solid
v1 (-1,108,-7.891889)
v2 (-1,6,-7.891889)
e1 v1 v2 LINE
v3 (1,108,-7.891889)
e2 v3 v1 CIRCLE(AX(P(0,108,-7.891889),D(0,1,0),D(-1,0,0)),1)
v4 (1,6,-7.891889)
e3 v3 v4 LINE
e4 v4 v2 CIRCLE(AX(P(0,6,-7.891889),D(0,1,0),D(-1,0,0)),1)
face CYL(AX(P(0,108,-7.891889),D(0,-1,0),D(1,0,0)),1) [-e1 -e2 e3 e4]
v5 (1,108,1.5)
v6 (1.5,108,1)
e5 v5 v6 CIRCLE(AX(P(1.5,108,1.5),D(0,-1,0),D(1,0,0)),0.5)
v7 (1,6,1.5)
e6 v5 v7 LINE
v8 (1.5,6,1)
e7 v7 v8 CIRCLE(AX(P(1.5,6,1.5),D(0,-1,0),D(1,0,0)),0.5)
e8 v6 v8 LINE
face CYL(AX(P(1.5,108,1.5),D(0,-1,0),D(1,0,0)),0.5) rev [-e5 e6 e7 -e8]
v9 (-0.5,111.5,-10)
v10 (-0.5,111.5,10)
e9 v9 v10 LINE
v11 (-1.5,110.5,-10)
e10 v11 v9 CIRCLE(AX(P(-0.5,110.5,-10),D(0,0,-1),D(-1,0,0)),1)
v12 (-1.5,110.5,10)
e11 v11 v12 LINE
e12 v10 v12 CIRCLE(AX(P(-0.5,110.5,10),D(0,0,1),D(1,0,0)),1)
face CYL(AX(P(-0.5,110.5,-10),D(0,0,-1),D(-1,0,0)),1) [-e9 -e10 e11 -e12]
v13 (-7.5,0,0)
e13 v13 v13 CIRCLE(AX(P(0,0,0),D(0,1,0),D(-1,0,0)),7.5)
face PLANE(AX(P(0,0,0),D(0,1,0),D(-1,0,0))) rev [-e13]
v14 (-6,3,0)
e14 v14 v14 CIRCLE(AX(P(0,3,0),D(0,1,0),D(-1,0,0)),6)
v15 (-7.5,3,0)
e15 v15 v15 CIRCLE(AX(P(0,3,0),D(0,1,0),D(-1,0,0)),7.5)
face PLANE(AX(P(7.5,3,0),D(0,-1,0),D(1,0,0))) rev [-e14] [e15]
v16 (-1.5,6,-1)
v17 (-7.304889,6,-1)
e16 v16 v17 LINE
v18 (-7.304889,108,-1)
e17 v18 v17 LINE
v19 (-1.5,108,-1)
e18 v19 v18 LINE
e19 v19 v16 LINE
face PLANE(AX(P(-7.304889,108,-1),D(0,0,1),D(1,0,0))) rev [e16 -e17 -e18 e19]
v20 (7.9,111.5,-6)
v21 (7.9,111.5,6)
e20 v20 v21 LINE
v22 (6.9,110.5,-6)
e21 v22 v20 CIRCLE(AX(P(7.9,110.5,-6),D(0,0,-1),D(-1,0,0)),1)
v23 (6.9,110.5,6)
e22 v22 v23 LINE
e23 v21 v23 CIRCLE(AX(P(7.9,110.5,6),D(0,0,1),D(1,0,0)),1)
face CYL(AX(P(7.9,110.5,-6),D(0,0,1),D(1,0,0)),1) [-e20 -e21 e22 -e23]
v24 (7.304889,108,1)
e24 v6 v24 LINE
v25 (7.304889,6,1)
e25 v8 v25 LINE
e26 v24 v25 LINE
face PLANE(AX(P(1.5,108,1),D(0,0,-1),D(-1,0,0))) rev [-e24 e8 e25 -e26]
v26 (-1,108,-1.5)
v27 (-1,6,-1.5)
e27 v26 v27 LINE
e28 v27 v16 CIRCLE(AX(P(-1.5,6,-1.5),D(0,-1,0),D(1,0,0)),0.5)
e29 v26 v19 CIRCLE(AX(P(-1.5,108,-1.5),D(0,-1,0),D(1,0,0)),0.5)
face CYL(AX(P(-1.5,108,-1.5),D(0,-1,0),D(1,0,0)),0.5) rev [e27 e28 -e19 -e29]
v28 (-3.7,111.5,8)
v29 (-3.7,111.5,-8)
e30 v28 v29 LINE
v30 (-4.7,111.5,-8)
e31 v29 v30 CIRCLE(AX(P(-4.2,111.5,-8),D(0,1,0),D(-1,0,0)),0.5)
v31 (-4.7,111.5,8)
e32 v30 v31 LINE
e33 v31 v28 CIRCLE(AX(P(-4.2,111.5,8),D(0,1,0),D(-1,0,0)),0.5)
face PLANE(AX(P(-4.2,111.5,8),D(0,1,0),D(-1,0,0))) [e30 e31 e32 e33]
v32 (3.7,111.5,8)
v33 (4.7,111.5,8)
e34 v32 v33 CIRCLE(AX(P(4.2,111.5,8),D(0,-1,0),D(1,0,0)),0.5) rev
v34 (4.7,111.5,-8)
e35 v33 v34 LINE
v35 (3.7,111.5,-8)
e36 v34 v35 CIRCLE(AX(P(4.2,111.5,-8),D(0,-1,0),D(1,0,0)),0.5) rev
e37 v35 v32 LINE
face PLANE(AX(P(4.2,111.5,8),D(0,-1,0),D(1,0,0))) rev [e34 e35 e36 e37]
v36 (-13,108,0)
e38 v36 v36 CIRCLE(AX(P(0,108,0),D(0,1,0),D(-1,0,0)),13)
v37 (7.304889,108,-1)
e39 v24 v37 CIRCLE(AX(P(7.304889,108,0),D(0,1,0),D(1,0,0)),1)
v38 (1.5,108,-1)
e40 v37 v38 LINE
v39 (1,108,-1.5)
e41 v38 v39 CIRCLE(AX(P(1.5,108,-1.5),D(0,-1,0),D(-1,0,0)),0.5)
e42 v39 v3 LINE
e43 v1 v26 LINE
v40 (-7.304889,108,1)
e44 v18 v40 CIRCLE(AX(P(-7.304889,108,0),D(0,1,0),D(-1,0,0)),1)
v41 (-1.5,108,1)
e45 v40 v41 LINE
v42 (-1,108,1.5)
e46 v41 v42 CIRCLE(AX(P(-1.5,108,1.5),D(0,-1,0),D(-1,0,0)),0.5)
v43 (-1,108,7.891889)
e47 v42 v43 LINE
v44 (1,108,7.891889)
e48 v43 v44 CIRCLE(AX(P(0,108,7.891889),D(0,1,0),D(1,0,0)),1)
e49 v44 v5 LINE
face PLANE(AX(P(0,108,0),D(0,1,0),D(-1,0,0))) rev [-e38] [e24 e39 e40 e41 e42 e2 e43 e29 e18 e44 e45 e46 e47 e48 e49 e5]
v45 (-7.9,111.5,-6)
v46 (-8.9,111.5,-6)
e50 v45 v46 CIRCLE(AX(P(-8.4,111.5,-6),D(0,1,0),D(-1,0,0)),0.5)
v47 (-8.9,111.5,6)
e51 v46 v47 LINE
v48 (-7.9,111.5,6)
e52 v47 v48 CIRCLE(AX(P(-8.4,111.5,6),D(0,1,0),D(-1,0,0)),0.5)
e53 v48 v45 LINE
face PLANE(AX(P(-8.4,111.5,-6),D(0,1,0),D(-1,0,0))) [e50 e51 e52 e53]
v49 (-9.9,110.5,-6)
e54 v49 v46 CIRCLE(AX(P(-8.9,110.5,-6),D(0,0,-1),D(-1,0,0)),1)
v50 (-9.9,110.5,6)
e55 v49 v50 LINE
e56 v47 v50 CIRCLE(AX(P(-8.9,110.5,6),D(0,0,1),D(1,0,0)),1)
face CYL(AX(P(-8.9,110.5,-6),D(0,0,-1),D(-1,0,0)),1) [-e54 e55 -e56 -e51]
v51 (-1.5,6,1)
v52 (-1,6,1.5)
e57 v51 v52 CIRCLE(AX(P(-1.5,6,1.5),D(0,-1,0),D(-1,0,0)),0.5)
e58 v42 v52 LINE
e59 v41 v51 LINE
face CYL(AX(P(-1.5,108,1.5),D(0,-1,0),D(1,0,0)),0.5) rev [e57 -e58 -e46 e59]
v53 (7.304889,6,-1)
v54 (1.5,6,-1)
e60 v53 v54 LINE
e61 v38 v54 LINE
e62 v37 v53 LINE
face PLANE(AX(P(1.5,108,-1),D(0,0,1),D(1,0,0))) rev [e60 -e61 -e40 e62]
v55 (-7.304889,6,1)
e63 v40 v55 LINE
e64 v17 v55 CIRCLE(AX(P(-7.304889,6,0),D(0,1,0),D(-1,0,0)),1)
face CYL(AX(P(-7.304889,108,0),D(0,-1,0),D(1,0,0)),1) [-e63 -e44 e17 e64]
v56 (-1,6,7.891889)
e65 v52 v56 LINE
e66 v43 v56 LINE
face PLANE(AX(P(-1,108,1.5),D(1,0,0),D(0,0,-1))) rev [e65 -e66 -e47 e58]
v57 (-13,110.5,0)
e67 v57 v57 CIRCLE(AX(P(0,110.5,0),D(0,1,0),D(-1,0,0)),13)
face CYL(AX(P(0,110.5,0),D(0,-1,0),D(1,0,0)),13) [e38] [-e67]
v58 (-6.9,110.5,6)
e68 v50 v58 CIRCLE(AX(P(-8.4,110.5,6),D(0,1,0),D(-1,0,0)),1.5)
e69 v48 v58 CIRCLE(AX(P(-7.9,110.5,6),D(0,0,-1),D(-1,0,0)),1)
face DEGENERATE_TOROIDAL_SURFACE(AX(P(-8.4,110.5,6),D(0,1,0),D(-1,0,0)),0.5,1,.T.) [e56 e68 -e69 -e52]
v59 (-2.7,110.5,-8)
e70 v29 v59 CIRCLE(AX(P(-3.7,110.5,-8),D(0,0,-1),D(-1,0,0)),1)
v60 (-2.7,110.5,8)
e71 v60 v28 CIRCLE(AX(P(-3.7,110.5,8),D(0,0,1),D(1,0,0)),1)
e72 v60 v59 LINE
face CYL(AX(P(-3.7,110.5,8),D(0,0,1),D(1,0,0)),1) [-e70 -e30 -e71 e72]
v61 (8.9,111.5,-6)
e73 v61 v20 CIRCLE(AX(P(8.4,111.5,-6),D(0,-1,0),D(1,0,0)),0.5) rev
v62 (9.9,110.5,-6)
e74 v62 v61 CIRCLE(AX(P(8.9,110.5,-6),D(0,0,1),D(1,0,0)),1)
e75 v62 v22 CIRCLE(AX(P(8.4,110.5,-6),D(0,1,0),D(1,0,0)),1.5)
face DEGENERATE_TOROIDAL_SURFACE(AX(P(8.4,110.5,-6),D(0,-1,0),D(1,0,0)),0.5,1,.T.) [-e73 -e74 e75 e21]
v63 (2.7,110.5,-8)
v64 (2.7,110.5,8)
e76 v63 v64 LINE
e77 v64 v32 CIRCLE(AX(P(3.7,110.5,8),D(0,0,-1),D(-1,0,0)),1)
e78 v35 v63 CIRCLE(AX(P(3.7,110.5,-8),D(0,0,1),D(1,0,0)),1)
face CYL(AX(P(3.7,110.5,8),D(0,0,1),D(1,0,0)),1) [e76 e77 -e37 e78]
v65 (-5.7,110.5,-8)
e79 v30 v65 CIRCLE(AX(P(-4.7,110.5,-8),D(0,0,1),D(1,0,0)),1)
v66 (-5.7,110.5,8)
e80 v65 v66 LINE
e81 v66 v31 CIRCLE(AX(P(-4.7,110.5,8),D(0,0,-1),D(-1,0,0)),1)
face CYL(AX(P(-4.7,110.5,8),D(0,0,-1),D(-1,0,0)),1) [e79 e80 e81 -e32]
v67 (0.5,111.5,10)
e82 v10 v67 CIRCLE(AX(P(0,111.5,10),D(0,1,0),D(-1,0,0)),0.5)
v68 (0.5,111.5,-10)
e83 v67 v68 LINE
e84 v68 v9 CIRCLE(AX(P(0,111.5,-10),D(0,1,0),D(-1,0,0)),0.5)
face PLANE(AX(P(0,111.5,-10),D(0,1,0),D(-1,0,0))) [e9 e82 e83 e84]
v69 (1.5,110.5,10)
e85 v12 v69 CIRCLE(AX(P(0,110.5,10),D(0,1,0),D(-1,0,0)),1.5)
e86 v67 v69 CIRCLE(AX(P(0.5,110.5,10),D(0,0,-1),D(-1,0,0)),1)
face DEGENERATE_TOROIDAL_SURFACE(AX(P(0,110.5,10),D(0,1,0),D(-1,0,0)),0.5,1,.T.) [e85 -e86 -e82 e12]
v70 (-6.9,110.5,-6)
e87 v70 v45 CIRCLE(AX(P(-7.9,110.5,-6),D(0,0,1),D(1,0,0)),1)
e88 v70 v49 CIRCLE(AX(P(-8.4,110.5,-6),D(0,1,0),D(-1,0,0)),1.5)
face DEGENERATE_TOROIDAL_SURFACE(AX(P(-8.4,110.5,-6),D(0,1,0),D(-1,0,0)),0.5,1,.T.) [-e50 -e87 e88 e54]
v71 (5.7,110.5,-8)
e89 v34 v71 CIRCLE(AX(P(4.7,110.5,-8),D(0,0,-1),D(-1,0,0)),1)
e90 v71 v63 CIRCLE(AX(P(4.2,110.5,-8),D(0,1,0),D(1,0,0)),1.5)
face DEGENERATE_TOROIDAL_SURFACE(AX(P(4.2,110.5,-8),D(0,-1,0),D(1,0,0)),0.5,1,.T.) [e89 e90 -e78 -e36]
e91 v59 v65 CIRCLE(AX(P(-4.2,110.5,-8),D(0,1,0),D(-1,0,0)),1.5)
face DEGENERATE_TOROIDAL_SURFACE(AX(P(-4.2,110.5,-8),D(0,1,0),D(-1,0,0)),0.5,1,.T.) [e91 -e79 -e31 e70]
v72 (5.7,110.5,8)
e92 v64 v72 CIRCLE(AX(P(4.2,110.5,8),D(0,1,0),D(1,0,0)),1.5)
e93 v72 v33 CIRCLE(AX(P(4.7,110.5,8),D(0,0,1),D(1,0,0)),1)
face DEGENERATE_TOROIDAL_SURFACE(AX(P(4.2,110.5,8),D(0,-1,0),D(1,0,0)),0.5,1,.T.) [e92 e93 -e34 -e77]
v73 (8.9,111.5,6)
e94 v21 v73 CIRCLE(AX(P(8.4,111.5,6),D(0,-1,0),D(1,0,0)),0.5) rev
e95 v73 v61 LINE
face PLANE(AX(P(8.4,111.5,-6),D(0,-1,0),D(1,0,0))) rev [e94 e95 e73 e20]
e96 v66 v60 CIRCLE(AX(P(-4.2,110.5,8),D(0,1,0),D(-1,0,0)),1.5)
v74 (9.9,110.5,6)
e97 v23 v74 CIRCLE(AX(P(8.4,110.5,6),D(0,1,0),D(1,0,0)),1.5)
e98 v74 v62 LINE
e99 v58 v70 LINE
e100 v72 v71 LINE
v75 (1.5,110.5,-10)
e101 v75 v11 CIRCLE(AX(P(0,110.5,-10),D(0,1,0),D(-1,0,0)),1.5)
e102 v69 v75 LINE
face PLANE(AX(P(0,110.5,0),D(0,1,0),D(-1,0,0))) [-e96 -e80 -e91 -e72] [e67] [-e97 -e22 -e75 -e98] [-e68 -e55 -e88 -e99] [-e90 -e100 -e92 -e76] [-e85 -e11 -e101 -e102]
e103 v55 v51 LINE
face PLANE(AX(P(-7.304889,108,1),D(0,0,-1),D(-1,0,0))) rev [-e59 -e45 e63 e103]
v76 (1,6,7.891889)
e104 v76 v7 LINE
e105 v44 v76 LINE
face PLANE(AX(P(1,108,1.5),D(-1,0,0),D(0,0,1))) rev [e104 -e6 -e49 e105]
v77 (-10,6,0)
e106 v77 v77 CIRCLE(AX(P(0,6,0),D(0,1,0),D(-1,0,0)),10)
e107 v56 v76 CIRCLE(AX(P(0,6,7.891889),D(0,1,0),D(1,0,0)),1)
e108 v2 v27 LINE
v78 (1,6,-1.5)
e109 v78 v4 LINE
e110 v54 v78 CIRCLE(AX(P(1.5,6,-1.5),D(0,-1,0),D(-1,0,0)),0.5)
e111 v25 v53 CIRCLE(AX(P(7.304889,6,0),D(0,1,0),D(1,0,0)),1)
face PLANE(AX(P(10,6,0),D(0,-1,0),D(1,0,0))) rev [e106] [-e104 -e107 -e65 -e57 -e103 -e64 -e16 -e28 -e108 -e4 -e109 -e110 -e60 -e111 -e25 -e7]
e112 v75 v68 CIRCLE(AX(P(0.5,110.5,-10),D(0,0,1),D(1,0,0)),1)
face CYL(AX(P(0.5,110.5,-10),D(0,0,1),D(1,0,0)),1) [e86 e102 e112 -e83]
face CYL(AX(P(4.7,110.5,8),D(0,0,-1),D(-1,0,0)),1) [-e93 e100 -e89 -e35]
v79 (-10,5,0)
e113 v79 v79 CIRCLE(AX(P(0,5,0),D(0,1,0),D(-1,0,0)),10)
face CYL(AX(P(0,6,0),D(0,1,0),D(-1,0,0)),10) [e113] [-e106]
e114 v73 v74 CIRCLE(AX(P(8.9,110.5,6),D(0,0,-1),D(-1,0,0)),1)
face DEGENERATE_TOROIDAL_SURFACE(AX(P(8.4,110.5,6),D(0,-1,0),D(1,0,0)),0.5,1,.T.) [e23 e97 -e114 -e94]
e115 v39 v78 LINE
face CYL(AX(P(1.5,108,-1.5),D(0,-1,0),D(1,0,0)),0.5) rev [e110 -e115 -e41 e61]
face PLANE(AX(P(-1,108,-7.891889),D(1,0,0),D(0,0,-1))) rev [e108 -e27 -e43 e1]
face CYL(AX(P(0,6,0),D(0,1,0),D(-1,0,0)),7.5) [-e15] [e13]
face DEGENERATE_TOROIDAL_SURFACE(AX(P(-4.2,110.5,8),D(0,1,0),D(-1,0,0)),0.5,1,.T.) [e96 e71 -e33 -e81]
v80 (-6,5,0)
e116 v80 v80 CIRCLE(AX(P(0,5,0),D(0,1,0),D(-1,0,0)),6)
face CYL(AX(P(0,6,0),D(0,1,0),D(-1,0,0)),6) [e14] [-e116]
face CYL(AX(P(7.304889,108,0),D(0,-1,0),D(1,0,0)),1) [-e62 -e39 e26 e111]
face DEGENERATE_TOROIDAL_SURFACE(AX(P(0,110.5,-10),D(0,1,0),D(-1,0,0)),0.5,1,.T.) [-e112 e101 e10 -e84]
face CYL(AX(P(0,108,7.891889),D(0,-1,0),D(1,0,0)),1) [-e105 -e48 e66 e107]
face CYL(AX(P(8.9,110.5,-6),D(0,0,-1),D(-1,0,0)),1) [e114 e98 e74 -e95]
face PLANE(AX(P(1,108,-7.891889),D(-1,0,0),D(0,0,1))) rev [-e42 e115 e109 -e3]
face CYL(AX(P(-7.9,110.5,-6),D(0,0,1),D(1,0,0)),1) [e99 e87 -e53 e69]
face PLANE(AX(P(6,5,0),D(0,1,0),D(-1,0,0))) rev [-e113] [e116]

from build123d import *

# Parameters (mm, degrees)
BOSS_EXTRUDE1_DEPTH = 102
SKETCH3_R           = 13
BOSS_EXTRUDE3_DEPTH = 2.5
BOSS_EXTRUDE4_DEPTH = 1
FILLET1_R           = 1


with BuildPart() as part:
    # Sketch1 → Revolve1 (revolve)
    with BuildSketch(Plane.XY, mode=Mode.PRIVATE) as revolve1_sk:
        Polygon((0, 0), (7.5, 0), (7.5, 3), (6, 3), (6, 5), (10, 5), (10, 6), (0, 6), align=None)
    revolve(revolve1_sk.sketch.rotate(Axis((0, 6, 0), (0, -1, 0)), 180), axis=Axis((0, 6, 0), (0, -1, 0)))

    # Sketch2 → Boss-Extrude1 (add)
    with BuildSketch(Plane(origin=(0, 6, 0), x_dir=(1, 0, 0), z_dir=(0, 1, 0))):
        with BuildLine():
            Line((-1, 7.891889069), (-1, 1.5))
            ThreePointArc((-1, 1.5), (-1.146446609, 1.146446609), (-1.5, 1))
            Line((-1.5, 1), (-7.304889055, 1))
            ThreePointArc((-7.304889055, 1), (-8.304889055, 0), (-7.304889055, -1))
            Line((-7.304889055, -1), (-1.5, -1))
            ThreePointArc((-1.5, -1), (-1.146446609, -1.146446609), (-1, -1.5))
            Line((-1, -1.5), (-1, -7.891889069))
            ThreePointArc((-1, -7.891889069), (0, -8.891889069), (1, -7.891889069))
            Line((1, -7.891889069), (1, -1.5))
            ThreePointArc((1, -1.5), (1.146446609, -1.146446609), (1.5, -1))
            Line((1.5, -1), (7.304889055, -1))
            ThreePointArc((7.304889055, -1), (8.304889055, 0), (7.304889055, 1))
            Line((7.304889055, 1), (1.5, 1))
            ThreePointArc((1.5, 1), (1.146446609, 1.146446609), (1, 1.5))
            Line((1, 1.5), (1, 7.891889069))
            ThreePointArc((1, 7.891889069), (0, 8.891889069), (-1, 7.891889069))
        make_face()
    extrude(amount=BOSS_EXTRUDE1_DEPTH)

    # Sketch3 → Boss-Extrude3 (add)
    with BuildSketch(Plane(origin=(0, 108, 0), x_dir=(1, 0, 0), z_dir=(0, 1, 0))):
        with Locations(Location((0, 0, 0), (0, 0, 180))):
            Circle(SKETCH3_R)
    extrude(amount=BOSS_EXTRUDE3_DEPTH)

    # Sketch4 → Boss-Extrude4 (add)
    with BuildSketch(Plane(origin=(0, 110.5, 0), x_dir=(1, 0, 0), z_dir=(0, 1, 0))):
        with BuildLine():
            Line((-1.5, 10), (-1.5, -10))
            ThreePointArc((-1.5, -10), (0, -11.5), (1.5, -10))
            Line((1.5, -10), (1.5, 10))
            ThreePointArc((1.5, 10), (0, 11.5), (-1.5, 10))
        make_face()
        with BuildLine():
            Line((-5.7, 8), (-5.7, -8))
            ThreePointArc((-5.7, -8), (-4.2, -9.5), (-2.7, -8))
            Line((-2.7, -8), (-2.7, 8))
            ThreePointArc((-2.7, 8), (-4.2, 9.5), (-5.7, 8))
        make_face()
        with BuildLine():
            Line((-9.9, 6), (-9.9, -6))
            ThreePointArc((-9.9, -6), (-8.4, -7.5), (-6.9, -6))
            Line((-6.9, -6), (-6.9, 6))
            ThreePointArc((-6.9, 6), (-8.4, 7.5), (-9.9, 6))
        make_face()
        with BuildLine():
            Line((6.9, 6), (6.9, -6))
            ThreePointArc((6.9, -6), (8.4, -7.5), (9.9, -6))
            Line((9.9, -6), (9.9, 6))
            ThreePointArc((9.9, 6), (8.4, 7.5), (6.9, 6))
        make_face()
        with BuildLine():
            Line((2.7, 8), (2.7, -8))
            ThreePointArc((2.7, -8), (4.2, -9.5), (5.7, -8))
            Line((5.7, -8), (5.7, 8))
            ThreePointArc((5.7, 8), (4.2, 9.5), (2.7, 8))
        make_face()
    extrude(amount=BOSS_EXTRUDE4_DEPTH)

    # Fillet1
    fillet1_edges = [part.edges().sort_by_distance(p)[0] for p in [
        (9.9, 111.5, 0),
        (8.4, 111.5, 7.5),
        (6.9, 111.5, 0),
        (8.4, 111.5, -7.5),
        (2.7, 111.5, 0),
        (4.2, 111.5, -9.5),
        (5.7, 111.5, 0),
        (4.2, 111.5, 9.5),
        (1.5, 111.5, 0),
        (0, 111.5, 11.5),
        (-1.5, 111.5, 0),
        (0, 111.5, -11.5),
        (-5.7, 111.5, 0),
        (-4.2, 111.5, -9.5),
        (-2.7, 111.5, 0),
        (-4.2, 111.5, 9.5),
        (-6.9, 111.5, 0),
        (-8.4, 111.5, 7.5),
        (-9.9, 111.5, 0),
        (-8.4, 111.5, -7.5),
    ]]
    fillet(fillet1_edges, radius=FILLET1_R - 0.0001)  # a hair under: the kernel refuses the full size


solid = part.part
